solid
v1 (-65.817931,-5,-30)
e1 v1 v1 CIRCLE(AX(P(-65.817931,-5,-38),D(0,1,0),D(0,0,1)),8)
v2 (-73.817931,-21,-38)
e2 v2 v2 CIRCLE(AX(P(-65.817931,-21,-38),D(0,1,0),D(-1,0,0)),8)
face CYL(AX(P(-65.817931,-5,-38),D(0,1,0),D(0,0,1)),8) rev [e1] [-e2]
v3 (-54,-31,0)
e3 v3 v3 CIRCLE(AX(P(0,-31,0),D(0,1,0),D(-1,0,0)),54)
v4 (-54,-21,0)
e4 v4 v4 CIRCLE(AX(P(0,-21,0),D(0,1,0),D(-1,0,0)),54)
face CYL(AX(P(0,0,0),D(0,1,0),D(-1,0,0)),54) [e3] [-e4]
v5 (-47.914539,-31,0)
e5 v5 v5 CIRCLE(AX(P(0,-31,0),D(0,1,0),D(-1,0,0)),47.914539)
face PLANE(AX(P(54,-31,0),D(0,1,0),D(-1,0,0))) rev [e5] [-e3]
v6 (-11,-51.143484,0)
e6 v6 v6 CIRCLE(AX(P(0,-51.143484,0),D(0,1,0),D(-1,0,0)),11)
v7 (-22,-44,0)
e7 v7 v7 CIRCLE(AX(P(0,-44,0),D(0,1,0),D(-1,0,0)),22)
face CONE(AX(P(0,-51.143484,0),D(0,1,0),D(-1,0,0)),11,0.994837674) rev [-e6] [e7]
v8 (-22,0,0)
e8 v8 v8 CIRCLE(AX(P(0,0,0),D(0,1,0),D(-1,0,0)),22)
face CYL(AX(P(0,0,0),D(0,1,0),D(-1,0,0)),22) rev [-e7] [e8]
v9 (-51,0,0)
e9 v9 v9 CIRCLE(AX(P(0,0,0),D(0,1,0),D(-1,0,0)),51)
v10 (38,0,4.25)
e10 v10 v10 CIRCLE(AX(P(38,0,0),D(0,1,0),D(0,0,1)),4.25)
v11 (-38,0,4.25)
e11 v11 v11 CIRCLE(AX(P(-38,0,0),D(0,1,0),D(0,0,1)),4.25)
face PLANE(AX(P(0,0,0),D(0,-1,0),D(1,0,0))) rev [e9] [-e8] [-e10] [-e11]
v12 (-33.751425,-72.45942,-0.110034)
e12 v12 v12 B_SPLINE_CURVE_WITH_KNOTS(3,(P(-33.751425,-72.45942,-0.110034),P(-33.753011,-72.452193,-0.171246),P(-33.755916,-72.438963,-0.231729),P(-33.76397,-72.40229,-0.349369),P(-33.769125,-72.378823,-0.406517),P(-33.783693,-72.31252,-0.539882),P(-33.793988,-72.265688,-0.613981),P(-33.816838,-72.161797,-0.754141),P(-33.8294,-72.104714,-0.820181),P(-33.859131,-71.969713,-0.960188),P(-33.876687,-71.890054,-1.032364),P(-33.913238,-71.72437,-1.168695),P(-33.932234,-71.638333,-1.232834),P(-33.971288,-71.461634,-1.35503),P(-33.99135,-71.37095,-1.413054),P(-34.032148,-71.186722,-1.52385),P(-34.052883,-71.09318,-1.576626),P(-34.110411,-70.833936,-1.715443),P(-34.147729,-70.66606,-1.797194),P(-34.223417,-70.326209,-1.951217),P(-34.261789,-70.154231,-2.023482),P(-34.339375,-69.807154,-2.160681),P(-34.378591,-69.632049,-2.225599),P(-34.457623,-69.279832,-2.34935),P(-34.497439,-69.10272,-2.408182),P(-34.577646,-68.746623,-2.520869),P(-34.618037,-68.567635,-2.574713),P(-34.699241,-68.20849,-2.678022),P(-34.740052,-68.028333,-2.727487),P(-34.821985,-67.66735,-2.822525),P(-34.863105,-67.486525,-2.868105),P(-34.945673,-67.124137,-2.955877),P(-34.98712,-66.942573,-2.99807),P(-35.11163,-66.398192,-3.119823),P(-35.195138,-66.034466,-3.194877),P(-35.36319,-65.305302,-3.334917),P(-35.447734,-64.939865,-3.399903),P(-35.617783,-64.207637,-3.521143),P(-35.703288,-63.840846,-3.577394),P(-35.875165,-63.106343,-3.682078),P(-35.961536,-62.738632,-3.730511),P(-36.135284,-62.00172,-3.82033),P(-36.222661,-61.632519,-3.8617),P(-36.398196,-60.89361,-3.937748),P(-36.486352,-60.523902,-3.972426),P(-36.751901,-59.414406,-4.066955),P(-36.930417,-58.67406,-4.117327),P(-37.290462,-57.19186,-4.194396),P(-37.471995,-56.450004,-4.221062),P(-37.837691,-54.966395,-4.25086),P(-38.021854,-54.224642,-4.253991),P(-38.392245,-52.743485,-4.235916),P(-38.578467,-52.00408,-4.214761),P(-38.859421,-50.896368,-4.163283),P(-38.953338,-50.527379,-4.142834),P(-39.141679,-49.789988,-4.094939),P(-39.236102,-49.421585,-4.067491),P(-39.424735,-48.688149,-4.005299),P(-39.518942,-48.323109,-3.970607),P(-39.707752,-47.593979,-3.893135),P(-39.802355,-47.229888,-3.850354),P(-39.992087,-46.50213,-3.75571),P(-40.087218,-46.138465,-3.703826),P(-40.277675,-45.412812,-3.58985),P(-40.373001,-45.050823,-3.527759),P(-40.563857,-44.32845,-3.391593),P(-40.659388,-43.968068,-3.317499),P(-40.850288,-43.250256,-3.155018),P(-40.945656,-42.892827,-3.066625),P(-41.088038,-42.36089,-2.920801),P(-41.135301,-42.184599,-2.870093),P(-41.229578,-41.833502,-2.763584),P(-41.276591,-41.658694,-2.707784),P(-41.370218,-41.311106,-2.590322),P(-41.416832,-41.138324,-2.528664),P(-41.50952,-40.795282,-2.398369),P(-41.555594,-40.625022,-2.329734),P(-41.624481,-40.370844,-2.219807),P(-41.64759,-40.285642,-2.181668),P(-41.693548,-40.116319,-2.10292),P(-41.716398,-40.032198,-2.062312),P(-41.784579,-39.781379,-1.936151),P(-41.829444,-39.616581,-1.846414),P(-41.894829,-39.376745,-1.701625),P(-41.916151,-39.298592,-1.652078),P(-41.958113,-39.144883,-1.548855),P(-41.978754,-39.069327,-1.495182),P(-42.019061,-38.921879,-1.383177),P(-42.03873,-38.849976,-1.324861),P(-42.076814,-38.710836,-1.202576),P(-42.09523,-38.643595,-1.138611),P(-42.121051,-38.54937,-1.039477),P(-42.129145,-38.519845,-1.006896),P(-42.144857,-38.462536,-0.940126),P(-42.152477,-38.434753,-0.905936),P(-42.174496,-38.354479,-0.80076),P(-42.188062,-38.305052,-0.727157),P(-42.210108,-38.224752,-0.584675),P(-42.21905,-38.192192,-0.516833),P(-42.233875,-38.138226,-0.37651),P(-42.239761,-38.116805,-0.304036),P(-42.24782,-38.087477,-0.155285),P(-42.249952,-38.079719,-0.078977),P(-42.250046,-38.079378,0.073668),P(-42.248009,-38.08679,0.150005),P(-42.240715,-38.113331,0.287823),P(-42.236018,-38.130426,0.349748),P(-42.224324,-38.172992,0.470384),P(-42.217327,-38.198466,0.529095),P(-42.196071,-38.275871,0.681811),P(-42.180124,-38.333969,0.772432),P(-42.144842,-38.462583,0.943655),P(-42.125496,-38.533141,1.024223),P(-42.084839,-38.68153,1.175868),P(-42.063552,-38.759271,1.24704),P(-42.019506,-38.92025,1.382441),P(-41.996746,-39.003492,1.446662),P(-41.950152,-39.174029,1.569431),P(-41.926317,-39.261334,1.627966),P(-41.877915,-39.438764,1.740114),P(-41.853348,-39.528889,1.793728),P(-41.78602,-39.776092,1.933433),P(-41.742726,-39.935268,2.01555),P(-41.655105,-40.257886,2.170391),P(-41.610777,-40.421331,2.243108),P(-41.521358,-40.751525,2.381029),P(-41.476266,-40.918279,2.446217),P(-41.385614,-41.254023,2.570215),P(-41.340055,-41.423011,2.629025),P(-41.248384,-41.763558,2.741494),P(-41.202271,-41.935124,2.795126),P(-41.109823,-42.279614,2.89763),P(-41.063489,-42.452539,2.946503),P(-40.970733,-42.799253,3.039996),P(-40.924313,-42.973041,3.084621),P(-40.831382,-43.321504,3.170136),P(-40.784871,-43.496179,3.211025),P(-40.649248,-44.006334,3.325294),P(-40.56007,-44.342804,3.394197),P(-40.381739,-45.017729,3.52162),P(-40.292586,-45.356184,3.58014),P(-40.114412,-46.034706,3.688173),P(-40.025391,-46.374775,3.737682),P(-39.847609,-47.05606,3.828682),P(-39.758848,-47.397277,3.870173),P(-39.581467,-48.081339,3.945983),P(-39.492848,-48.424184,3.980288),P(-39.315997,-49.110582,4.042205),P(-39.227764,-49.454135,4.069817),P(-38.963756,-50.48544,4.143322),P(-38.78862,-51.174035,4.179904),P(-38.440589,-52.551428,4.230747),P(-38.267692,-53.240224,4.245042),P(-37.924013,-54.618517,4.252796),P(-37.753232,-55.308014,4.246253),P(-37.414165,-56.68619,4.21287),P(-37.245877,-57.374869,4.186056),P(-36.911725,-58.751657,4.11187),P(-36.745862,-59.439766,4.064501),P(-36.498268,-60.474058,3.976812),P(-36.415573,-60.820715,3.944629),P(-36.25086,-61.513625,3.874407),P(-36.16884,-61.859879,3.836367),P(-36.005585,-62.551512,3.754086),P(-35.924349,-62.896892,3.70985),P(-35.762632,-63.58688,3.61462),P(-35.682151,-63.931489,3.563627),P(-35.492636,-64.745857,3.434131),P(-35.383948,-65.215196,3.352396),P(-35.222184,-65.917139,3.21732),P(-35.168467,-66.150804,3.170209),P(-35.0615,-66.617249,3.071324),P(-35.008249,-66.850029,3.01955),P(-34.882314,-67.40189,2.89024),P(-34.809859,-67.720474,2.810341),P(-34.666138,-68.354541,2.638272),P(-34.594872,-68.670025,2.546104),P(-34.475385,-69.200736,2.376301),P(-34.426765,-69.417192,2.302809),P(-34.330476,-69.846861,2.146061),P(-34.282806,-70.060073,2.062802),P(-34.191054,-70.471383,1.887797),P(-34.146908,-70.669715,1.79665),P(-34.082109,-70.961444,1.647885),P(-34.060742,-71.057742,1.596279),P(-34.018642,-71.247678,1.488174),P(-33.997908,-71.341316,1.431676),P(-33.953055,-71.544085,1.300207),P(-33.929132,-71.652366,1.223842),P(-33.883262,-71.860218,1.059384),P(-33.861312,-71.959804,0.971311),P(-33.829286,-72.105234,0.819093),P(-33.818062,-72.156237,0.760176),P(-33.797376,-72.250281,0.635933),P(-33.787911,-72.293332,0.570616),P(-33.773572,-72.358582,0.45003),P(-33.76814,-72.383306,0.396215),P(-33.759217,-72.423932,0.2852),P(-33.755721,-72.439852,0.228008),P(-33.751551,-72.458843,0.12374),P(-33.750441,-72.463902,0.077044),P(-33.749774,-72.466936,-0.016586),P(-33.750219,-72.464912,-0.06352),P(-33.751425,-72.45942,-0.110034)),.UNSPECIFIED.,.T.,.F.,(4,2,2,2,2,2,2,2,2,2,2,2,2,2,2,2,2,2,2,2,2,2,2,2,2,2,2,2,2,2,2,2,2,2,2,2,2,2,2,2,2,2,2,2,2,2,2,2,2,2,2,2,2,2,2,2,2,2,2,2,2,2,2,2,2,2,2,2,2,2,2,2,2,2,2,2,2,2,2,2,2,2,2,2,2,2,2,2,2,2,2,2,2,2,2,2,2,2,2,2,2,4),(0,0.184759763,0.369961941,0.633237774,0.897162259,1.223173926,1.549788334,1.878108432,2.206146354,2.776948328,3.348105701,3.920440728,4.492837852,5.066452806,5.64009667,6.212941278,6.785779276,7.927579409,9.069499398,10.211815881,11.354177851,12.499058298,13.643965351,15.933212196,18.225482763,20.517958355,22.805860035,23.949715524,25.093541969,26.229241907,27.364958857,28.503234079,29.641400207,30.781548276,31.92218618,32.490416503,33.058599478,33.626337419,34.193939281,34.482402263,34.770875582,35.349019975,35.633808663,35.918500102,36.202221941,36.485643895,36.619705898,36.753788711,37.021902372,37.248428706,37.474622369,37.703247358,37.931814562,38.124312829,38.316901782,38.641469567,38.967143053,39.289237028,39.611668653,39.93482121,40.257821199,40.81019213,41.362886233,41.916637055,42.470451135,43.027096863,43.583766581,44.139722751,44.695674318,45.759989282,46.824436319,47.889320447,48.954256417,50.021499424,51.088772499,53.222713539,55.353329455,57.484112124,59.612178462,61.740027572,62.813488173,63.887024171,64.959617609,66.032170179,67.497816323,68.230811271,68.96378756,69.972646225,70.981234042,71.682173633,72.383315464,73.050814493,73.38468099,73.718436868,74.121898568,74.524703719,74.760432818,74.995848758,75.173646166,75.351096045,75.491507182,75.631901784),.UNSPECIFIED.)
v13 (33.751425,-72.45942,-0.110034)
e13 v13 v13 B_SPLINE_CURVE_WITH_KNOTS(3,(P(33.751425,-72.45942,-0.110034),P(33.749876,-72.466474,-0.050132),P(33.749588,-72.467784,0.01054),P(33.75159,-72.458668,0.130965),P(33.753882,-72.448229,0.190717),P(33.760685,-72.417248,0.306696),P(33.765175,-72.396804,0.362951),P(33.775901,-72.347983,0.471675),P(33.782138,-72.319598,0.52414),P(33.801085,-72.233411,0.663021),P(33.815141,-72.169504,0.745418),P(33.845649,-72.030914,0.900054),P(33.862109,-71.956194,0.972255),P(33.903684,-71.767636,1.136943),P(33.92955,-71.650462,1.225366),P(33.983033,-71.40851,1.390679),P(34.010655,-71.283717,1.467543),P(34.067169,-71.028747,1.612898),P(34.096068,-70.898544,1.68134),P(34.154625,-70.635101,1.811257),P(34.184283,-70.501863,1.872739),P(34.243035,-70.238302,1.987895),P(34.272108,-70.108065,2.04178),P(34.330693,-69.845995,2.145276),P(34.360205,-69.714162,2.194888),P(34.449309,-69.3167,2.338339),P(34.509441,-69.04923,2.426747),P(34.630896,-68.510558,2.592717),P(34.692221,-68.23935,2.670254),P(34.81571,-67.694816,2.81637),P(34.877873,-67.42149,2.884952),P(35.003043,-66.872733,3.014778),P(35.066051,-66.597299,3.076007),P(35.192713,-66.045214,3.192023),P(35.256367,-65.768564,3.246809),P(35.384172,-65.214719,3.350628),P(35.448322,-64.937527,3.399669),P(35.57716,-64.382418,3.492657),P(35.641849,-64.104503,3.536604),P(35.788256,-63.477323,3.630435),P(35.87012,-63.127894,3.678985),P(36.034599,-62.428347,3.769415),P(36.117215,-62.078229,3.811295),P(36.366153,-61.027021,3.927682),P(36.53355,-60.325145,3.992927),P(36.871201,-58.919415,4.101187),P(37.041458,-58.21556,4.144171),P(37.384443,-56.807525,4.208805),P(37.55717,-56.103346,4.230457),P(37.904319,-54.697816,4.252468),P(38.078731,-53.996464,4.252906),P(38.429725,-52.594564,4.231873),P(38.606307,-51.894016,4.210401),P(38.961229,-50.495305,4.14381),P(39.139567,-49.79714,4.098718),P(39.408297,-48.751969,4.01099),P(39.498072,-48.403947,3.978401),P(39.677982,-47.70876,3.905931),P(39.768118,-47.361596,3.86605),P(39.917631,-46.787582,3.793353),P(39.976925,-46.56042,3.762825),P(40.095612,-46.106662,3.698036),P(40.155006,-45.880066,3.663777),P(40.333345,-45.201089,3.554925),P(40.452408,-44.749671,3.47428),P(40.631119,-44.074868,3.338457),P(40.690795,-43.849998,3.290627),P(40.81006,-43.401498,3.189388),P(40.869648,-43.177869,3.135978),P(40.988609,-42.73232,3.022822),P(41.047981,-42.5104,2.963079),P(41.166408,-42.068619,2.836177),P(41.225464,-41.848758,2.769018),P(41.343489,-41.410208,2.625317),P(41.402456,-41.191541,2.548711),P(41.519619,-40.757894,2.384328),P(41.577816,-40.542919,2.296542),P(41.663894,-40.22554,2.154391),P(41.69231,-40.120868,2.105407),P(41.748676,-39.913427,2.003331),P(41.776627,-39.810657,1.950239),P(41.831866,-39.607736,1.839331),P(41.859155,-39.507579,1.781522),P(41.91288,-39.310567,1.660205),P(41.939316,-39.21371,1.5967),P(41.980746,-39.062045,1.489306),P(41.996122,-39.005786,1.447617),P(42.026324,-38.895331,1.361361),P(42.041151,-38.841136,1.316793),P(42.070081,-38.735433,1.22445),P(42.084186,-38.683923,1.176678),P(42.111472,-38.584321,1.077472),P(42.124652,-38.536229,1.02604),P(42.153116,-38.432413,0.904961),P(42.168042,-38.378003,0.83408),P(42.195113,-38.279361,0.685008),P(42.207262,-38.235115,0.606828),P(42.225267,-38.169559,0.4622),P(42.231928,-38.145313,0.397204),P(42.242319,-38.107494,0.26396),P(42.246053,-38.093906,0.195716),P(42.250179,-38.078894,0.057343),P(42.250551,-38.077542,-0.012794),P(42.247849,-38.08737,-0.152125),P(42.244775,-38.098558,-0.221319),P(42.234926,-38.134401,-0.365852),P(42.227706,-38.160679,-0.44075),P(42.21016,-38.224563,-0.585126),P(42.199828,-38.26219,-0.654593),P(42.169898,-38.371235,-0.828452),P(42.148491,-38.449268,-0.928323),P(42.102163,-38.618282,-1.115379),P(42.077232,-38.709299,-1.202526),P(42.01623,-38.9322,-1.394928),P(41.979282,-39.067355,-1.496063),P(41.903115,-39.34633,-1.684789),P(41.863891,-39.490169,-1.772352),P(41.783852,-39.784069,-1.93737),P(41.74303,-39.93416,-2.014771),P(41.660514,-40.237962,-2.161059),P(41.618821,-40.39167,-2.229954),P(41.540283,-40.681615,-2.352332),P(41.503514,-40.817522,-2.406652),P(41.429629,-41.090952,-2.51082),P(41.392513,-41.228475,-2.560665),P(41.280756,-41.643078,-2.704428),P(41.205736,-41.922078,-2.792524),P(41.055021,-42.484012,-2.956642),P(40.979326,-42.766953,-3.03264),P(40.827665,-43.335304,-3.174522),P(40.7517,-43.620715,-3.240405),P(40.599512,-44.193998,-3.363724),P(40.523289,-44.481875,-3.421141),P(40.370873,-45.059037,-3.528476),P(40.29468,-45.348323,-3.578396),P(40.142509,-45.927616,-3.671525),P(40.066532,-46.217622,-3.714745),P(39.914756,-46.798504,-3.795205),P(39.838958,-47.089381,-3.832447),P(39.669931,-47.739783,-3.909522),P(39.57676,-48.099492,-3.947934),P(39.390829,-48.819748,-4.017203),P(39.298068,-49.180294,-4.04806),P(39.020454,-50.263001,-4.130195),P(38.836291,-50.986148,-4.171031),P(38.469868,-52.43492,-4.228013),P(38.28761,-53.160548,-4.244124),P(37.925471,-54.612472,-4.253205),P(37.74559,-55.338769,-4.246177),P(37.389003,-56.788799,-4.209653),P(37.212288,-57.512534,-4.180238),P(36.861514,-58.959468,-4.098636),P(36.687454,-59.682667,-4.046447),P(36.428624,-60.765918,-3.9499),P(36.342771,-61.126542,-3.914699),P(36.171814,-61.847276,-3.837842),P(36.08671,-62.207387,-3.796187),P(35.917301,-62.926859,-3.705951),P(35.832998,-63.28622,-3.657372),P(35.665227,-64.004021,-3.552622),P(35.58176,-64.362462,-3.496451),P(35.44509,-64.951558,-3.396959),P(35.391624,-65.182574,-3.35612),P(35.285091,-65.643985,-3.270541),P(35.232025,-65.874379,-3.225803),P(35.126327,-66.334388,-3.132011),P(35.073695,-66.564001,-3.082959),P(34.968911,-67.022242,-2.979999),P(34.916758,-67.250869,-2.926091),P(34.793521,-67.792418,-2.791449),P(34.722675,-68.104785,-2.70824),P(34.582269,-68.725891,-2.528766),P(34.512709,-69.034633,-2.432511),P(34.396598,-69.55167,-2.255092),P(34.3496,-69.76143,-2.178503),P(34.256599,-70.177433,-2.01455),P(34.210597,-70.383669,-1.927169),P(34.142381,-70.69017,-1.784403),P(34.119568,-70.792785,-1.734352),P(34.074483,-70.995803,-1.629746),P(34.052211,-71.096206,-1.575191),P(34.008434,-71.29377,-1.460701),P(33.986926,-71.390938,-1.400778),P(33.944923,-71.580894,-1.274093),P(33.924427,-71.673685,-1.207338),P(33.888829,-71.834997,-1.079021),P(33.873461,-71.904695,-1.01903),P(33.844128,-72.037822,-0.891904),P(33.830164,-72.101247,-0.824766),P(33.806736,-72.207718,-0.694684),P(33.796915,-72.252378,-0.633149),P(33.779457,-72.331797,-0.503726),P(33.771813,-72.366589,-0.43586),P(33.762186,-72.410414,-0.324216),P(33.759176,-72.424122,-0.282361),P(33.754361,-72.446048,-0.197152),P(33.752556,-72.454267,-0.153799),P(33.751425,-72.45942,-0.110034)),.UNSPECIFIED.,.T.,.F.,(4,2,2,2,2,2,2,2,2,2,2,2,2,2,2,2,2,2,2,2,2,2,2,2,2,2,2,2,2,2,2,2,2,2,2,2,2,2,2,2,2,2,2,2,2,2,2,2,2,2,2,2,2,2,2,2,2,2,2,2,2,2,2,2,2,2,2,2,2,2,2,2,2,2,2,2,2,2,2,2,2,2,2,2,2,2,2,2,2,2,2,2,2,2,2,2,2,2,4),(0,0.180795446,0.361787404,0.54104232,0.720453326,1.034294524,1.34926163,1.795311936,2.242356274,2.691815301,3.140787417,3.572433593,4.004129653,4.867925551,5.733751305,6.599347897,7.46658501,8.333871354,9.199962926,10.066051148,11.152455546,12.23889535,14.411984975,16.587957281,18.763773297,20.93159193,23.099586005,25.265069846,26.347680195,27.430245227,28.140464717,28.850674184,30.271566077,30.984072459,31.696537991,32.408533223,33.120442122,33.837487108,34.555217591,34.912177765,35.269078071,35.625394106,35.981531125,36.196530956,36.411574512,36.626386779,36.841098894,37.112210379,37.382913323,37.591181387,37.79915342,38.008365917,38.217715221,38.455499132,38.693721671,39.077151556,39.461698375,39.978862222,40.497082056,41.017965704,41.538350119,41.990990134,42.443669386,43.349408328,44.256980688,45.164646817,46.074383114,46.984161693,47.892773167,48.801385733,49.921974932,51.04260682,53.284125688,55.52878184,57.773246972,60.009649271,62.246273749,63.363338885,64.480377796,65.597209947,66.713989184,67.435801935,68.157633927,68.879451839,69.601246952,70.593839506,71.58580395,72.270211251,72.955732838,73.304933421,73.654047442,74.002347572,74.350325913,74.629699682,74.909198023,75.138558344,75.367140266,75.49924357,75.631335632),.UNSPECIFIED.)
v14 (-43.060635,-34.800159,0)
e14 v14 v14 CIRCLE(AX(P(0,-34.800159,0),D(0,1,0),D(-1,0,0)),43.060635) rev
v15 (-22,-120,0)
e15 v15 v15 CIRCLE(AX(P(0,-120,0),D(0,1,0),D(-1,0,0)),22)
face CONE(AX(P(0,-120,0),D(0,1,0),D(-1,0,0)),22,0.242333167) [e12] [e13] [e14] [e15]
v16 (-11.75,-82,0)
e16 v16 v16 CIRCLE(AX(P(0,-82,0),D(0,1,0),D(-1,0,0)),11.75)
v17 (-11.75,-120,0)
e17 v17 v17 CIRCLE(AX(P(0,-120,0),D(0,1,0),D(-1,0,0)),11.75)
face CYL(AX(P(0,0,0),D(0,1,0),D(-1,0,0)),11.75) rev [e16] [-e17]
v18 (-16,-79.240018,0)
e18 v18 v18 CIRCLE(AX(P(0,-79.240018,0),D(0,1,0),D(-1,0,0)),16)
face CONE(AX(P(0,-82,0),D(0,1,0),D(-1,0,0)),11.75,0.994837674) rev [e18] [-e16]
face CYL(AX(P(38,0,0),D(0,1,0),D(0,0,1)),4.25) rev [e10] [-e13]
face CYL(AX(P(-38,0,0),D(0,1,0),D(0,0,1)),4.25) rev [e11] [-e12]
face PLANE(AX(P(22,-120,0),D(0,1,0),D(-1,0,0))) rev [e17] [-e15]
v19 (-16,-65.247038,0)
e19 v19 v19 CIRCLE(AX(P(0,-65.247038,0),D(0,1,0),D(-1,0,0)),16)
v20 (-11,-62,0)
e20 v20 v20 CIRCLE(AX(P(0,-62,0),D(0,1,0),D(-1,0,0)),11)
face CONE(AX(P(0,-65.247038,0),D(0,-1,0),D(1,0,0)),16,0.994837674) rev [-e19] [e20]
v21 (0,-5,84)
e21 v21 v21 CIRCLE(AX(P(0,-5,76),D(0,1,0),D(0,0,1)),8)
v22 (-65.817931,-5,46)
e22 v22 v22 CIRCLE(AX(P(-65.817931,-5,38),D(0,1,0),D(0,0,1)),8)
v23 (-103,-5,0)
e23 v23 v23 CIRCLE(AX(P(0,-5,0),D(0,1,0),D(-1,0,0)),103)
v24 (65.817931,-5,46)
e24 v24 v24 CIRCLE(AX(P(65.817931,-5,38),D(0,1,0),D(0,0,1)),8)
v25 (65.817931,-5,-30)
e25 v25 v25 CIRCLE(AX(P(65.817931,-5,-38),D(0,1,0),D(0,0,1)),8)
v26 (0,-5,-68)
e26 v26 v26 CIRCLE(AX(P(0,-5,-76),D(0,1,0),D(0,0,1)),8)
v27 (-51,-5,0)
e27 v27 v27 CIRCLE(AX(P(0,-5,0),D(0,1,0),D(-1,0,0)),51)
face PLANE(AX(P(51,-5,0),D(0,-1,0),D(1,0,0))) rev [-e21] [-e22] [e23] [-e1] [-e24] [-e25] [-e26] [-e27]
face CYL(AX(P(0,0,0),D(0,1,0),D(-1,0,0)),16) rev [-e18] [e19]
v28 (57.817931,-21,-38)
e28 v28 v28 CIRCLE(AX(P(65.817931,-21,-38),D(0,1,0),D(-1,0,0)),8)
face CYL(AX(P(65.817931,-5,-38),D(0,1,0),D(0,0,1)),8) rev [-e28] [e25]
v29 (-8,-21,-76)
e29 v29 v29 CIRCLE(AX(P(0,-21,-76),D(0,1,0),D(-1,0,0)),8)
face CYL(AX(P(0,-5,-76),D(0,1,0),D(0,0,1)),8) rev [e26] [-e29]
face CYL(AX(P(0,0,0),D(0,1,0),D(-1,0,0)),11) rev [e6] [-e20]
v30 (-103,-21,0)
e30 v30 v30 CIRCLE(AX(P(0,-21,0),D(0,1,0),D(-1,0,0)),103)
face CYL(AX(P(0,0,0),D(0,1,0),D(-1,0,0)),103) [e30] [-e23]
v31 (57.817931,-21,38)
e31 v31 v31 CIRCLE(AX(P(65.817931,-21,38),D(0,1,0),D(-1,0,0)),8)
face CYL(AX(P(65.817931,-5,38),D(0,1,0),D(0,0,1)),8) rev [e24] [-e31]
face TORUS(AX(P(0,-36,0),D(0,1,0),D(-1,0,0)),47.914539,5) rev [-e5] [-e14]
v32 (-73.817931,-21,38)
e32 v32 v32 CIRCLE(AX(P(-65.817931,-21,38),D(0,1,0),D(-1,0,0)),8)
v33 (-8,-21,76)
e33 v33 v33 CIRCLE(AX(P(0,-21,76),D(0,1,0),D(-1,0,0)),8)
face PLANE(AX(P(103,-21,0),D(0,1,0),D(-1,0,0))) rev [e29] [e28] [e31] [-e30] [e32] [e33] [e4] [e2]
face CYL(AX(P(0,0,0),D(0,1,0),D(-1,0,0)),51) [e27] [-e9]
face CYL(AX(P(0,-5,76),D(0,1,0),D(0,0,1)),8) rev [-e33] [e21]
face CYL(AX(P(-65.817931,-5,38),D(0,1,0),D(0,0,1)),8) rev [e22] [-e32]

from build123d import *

# Parameters (mm, degrees)
FILLET1_R                 = 5
F_1_0_16_DIAMETER_HOLE1_D = 16
CIRPATTERN1_COUNT         = 6
M10X1_5_TAPPED_HOLE1_D    = 8.5


# Read off the part's stored shape, not the designer's step: Cut-Revolve-Thin1
with BuildPart() as part:
    # Sketch1 → Revolve1 (revolve)
    with BuildSketch(Plane.XY, mode=Mode.PRIVATE) as revolve1_sk:
        Polygon((0, 0), (51, 0), (51, -5), (103, -5), (103, -21), (54, -21), (54, -31), (44, -31), (22, -120), (0, -120), align=None)
    revolve(revolve1_sk.sketch.rotate(Axis((0, 0, 0), (0, -1, 0)), 180), axis=Axis((0, 0, 0), (0, -1, 0)))

    # Cut-Revolve-Thin1 outline → Cut-Revolve-Thin1 (revolve, cut)
    with BuildSketch(Plane.XY):
        Polygon((0, -120), (11.75, -120), (11.75, -82), (16, -79.240017729), (16, -65.247037966), (11, -62), (11, -51.143483525), (22, -44), (22, 0), (0, 0), align=None)
    revolve(axis=Axis((0, 0, 0), (0, 1, 0)), mode=Mode.SUBTRACT)

    # Fillet1
    fillet1_edges = [part.edges().sort_by_distance(p)[0] for p in [
        (44, -31, 0),
    ]]
    fillet(fillet1_edges, radius=FILLET1_R)

    # Ø1.0 (16) Diameter Hole1 (through all)
    with Locations(Plane(origin=(0, -5, 0), x_dir=(1, 0, 0), z_dir=(0, 1, 0))):
        with Locations((0, 76)):
            f_1_0_16_diameter_hole1 = Hole(F_1_0_16_DIAMETER_HOLE1_D / 2)

    # CirPattern1: Ø1.0 (16) Diameter Hole1 ×6 about axis
    cirpattern1_axis = Axis((0, 0, 0), (0, 1, 0))
    for i in range(1, CIRPATTERN1_COUNT):
        add(f_1_0_16_diameter_hole1.rotate(cirpattern1_axis, i * 360 / CIRPATTERN1_COUNT), mode=Mode.SUBTRACT)

    # M10x1.5 Tapped Hole1 (through all)
    with Locations(Plane(origin=(0, 0, 0), x_dir=(1, 0, 0), z_dir=(0, 1, 0))):
        with Locations((38, 0), (-38, 0)):
            Hole(M10X1_5_TAPPED_HOLE1_D / 2)


solid = part.part
